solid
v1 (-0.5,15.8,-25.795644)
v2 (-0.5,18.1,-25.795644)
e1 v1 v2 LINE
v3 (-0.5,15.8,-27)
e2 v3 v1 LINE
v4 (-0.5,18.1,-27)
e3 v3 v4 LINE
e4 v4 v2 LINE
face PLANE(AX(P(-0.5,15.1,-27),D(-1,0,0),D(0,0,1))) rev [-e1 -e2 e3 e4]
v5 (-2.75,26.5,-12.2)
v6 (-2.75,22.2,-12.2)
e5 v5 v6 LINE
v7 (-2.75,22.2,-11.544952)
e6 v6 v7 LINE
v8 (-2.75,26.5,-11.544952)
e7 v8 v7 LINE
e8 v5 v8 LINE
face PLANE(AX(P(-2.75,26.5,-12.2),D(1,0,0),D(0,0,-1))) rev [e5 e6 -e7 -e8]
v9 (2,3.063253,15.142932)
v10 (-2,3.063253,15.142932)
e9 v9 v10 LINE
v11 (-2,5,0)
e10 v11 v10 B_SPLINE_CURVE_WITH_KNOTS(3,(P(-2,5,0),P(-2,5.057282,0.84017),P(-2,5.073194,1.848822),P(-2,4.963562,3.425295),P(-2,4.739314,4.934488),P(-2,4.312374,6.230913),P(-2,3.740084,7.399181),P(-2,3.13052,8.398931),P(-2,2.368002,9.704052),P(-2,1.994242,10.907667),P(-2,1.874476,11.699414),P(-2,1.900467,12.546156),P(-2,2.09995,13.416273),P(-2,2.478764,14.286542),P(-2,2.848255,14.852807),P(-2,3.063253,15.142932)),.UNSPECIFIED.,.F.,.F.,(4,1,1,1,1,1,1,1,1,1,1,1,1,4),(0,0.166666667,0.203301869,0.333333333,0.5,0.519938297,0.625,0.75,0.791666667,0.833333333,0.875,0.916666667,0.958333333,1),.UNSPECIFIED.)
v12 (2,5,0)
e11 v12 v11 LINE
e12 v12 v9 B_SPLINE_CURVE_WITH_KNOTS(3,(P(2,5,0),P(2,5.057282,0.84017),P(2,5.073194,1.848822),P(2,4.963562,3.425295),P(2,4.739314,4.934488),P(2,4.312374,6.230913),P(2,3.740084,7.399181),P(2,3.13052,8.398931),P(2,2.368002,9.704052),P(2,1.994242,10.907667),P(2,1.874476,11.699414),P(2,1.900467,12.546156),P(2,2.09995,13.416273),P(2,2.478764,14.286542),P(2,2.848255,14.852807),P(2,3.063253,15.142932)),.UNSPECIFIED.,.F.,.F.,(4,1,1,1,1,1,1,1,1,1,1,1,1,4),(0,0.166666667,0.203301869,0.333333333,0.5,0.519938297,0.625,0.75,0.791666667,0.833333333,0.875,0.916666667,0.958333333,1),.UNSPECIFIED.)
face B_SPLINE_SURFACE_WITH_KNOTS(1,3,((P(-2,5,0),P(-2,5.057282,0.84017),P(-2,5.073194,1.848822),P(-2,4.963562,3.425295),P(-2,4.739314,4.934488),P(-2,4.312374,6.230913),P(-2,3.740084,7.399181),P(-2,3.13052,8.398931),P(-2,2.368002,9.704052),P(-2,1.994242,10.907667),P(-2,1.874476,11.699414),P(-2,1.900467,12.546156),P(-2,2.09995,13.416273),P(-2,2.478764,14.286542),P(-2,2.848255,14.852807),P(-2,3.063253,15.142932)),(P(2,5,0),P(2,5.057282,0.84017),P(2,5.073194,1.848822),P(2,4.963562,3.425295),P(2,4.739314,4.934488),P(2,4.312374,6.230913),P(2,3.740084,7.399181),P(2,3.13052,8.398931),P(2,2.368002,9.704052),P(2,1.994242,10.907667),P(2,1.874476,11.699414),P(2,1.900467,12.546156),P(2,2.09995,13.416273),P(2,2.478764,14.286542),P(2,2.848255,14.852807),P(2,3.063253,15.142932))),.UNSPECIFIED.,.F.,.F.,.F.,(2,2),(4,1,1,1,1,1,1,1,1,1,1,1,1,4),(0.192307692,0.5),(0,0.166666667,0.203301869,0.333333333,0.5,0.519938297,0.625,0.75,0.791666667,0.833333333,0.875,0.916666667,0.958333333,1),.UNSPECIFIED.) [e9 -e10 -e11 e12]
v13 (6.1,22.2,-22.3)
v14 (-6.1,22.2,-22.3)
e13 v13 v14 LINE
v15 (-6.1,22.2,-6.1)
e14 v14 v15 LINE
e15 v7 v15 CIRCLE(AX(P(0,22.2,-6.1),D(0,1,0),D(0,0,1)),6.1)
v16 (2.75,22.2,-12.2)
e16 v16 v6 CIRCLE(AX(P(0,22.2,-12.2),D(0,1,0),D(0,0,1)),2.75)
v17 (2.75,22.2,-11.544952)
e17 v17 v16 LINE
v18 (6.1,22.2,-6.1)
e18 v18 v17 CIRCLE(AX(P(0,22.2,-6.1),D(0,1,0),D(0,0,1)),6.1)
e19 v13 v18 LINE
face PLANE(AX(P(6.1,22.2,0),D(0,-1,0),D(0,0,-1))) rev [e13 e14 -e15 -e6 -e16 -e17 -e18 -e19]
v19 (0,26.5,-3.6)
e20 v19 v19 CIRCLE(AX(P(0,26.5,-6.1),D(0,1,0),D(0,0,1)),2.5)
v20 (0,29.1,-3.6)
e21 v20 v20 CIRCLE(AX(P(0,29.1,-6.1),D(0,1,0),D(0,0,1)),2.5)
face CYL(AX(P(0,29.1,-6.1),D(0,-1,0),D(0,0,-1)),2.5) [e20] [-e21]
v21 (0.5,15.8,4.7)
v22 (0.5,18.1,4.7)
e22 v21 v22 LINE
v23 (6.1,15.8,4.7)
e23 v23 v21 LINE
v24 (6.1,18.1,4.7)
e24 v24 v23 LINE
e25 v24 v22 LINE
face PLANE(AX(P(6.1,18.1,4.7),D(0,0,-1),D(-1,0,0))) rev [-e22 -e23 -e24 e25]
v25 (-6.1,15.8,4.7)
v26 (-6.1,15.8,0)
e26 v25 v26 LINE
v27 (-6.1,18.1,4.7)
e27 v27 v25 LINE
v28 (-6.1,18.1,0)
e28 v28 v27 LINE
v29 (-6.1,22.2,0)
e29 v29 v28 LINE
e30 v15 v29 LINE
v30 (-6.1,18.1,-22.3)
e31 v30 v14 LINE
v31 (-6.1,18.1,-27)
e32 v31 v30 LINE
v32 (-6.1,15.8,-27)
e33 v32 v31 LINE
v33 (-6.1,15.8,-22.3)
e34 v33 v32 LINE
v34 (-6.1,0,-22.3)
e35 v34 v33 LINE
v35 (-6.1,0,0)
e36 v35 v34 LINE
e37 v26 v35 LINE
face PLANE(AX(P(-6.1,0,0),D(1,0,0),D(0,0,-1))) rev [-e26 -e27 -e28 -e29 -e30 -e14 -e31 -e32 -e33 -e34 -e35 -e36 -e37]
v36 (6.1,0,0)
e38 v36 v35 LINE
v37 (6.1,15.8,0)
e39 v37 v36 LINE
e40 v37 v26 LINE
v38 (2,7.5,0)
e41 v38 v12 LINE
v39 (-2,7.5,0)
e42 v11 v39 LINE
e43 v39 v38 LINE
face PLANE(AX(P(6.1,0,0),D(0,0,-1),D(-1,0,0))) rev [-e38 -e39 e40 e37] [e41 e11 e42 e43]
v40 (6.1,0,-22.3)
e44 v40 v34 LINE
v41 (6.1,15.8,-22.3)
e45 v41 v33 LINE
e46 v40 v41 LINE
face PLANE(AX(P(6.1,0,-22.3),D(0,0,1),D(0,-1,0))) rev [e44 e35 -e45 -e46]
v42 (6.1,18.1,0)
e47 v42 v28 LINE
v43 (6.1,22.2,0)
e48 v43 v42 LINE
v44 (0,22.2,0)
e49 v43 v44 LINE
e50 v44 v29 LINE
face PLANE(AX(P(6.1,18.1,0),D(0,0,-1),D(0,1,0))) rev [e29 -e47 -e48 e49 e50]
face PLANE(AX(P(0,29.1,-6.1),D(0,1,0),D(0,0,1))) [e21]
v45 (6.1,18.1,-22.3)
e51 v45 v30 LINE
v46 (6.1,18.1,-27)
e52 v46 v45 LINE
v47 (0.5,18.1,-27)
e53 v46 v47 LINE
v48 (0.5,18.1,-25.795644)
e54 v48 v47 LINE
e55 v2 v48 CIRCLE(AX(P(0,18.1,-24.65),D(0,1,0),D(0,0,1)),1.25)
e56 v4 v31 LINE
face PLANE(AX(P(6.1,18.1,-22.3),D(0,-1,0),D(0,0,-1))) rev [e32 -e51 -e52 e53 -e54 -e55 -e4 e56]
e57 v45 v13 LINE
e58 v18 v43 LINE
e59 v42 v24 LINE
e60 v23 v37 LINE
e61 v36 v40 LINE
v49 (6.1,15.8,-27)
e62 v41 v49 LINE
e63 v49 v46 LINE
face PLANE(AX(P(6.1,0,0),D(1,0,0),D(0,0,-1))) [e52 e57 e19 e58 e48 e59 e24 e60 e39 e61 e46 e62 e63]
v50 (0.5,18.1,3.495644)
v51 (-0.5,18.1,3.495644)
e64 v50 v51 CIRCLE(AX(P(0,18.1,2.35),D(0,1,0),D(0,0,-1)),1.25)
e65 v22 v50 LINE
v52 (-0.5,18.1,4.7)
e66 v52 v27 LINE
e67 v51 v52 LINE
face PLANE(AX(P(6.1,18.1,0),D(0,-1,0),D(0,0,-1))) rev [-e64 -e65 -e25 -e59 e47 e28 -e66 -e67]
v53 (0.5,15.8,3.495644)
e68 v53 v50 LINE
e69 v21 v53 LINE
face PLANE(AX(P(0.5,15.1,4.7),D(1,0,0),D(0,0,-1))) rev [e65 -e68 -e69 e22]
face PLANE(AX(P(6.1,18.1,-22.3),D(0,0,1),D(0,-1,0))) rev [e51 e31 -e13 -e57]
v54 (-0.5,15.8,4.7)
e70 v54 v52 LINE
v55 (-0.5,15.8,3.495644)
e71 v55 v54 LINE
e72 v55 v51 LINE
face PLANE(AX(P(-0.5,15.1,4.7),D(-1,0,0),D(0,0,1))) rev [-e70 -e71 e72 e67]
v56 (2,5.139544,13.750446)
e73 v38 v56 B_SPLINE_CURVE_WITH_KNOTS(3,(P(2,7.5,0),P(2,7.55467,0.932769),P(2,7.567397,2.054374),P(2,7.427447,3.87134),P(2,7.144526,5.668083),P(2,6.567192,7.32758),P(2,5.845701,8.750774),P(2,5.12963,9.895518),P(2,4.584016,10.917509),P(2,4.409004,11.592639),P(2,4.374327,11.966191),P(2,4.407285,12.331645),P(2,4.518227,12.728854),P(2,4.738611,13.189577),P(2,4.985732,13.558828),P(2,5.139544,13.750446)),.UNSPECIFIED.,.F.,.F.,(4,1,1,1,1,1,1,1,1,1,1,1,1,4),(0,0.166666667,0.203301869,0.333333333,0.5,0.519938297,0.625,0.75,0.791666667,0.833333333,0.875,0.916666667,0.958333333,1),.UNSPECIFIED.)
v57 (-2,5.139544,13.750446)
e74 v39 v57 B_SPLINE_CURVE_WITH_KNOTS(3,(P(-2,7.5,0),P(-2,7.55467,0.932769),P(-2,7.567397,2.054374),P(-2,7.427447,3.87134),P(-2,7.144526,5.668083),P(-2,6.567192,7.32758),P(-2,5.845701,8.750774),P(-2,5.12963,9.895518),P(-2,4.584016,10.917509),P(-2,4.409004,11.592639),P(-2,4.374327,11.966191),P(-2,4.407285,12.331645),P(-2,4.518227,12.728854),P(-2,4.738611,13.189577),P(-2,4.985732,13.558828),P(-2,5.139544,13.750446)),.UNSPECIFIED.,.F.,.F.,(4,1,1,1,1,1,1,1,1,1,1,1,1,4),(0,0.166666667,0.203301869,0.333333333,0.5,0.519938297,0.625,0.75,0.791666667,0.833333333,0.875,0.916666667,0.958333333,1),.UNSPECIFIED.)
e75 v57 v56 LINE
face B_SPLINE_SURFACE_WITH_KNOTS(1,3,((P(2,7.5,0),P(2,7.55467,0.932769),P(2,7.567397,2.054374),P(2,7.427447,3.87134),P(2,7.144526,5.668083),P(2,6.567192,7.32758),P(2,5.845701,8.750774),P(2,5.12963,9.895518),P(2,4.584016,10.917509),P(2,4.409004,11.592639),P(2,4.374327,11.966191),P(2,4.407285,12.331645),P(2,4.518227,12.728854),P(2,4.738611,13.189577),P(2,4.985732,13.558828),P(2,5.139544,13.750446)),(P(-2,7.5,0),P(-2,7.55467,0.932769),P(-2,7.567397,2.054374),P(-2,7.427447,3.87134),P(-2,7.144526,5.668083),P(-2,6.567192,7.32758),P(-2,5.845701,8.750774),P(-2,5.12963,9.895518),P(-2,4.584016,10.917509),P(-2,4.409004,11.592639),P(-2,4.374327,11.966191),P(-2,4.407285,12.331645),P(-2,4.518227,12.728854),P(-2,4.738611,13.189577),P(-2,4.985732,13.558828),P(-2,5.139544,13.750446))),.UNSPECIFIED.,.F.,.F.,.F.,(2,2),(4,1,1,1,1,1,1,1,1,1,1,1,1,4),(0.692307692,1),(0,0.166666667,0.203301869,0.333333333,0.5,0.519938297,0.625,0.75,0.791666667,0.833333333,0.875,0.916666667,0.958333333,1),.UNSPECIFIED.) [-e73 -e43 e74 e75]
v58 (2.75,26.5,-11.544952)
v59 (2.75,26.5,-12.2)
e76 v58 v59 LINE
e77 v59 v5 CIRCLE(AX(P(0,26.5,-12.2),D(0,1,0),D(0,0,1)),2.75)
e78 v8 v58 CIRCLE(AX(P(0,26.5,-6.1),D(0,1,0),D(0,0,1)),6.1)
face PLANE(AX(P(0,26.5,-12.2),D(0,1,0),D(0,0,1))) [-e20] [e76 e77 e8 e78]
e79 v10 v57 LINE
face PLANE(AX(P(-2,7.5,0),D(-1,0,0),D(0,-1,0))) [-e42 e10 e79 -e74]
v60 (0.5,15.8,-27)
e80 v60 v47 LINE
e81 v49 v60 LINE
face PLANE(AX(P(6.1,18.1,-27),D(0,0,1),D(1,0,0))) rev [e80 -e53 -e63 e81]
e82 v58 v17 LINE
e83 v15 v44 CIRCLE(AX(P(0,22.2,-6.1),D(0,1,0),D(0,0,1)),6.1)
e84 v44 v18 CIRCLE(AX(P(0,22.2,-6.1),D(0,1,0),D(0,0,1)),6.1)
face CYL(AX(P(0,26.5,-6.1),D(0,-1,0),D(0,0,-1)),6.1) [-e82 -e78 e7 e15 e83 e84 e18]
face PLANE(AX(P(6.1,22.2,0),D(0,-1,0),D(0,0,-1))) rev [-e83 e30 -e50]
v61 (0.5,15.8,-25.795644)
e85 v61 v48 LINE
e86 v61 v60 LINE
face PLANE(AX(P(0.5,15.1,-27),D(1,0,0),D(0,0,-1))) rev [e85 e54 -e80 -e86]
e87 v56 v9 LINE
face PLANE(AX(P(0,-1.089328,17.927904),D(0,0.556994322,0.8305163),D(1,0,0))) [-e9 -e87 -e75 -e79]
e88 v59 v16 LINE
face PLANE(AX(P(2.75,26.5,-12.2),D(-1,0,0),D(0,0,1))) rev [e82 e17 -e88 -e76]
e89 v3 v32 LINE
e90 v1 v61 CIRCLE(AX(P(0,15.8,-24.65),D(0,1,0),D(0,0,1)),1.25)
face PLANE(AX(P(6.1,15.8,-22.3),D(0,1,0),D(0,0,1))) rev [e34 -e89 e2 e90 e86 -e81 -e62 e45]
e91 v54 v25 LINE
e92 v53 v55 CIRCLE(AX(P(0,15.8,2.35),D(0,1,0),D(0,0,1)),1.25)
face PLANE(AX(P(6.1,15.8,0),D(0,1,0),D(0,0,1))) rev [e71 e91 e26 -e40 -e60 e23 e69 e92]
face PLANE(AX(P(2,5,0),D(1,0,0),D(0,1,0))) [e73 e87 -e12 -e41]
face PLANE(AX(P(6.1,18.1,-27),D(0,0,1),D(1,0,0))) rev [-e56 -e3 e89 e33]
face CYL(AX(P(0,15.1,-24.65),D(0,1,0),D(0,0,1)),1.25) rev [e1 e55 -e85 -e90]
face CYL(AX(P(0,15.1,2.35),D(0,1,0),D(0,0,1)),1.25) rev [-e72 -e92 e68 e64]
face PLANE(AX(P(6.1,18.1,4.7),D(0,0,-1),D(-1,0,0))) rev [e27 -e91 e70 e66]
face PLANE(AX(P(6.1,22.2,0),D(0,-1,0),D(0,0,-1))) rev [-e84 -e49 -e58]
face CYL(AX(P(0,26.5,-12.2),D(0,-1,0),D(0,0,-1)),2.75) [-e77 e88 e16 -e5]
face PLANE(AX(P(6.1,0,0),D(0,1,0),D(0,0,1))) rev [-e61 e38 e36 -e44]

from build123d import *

# Parameters (mm, degrees)
EXTRUDE_1_DEPTH     = 6.1
EXTRUDE_2_DEPTH     = 4.3
SKETCH_3_R          = 2.5
EXTRUDE_3_DEPTH     = 2.6
SWEEP_START         = -2
SWEEP_1_DEPTH       = 4
CUT_EXTRUDE_1_DEPTH = 3


# Read off the part's stored shape, not the designer's step: По траектории1
with BuildPart() as part:
    # Эскиз1 → Бобышка-Вытянуть1 (new, symmetric)
    with BuildSketch(Plane(origin=(0, 0, 0), x_dir=(0, 0, -1), z_dir=(1, 0, 0))):
        Polygon((0, 0), (22.3, 0), (22.3, 15.8), (27, 15.8), (27, 18.1), (22.3, 18.1), (22.3, 22.2), (0, 22.2), (0, 18.1), (-4.7, 18.1), (-4.7, 15.8), (0, 15.8), align=None)
    extrude(amount=EXTRUDE_1_DEPTH, both=True)

    # Эскиз2 → Бобышка-Вытянуть2 (add)
    with BuildSketch(Plane(origin=(0, 22.2, 0), x_dir=(1, 0, 0), z_dir=(0, 1, 0))):
        with BuildLine():
            Line((-2.75, 12.2), (-2.75, 11.54495179))
            ThreePointArc((-2.75, 11.54495179), (0, 0), (2.75, 11.54495179))
            Line((2.75, 11.54495179), (2.75, 12.2))
            ThreePointArc((2.75, 12.2), (0, 14.95), (-2.75, 12.2))
        make_face()
    extrude(amount=EXTRUDE_2_DEPTH)

    # Эскиз3 → Бобышка-Вытянуть3 (add)
    with BuildSketch(Plane(origin=(0, 26.5, 0), x_dir=(1, 0, 0), z_dir=(0, 1, 0))):
        with Locations(Location((0, 6.1, 0), (0, 0, 270))):
            Circle(SKETCH_3_R)
    extrude(amount=EXTRUDE_3_DEPTH)

    # По траектории1 outline → По траектории1 (add)
    with BuildSketch(Plane.YZ.offset(SWEEP_START)):
        with BuildLine():
            Line((5, 0), (7.5, 0))
            add(Edge.make_bspline(
                [(7.5, 0), (7.55466995, 0.932768751), (7.567397074, 2.054373731), (7.427446861, 3.871339503), (7.144525851, 5.668082774), (6.567191568, 7.327579523), (5.845700953, 8.750774075), (5.129629815, 9.89551827), (4.584016429, 10.917508592), (4.409004277, 11.592638933), (4.374327462, 11.966191087), (4.40728466, 12.331644555), (4.518227027, 12.728854054), (4.738611449, 13.18957707), (4.985731728, 13.5588281), (5.139543938, 13.750446366)],
                knots=[0, 0, 0, 0, 0.166666667, 0.203301869, 0.333333333, 0.5, 0.519938297, 0.625, 0.75, 0.791666667, 0.833333333, 0.875, 0.916666667, 0.958333333, 1, 1, 1, 1], degree=3))
            Line((5.139543938, 13.750446366), (3.063253187, 15.142932171))
            add(Edge.make_bspline(
                [(5, 0), (5.057281604, 0.840170125), (5.073194453, 1.848822262), (4.963561919, 3.425294528), (4.739313637, 4.934487741), (4.312374062, 6.230912608), (3.740083573, 7.399180935), (3.13051994, 8.398930623), (2.368002426, 9.70405156), (1.994241871, 10.907667376), (1.874475502, 11.699413606), (1.900467078, 12.546155788), (2.099949953, 13.416272622), (2.478763958, 14.286542274), (2.848255397, 14.852807038), (3.063253187, 15.142932171)],
                knots=[0, 0, 0, 0, 0.166666667, 0.203301869, 0.333333333, 0.5, 0.519938297, 0.625, 0.75, 0.791666667, 0.833333333, 0.875, 0.916666667, 0.958333333, 1, 1, 1, 1], degree=3))
        make_face()
    extrude(amount=SWEEP_1_DEPTH)

    # Эскиз6 → Вырез-Вытянуть1 (cut)
    with BuildSketch(Plane(origin=(0, 18.1, 0), x_dir=(1, 0, 0), z_dir=(0, 1, 0))):
        with BuildLine():
            Line((-0.5, 27), (-0.5, 25.795643924))
            ThreePointArc((-0.5, 25.795643924), (0, 23.4), (0.5, 25.795643924))
            Line((0.5, 25.795643924), (0.5, 27))
            Line((0.5, 27), (0, 27))
            Line((0, 27), (-0.5, 27))
        make_face()
        with BuildLine():
            Line((0.5, -4.7), (0.5, -3.495643924))
            ThreePointArc((0.5, -3.495643924), (0, -1.1), (-0.5, -3.495643924))
            Line((-0.5, -3.495643924), (-0.5, -4.7))
            Line((-0.5, -4.7), (0, -4.7))
            Line((0, -4.7), (0.5, -4.7))
        make_face()
    extrude(amount=-CUT_EXTRUDE_1_DEPTH, mode=Mode.SUBTRACT)


solid = part.part
